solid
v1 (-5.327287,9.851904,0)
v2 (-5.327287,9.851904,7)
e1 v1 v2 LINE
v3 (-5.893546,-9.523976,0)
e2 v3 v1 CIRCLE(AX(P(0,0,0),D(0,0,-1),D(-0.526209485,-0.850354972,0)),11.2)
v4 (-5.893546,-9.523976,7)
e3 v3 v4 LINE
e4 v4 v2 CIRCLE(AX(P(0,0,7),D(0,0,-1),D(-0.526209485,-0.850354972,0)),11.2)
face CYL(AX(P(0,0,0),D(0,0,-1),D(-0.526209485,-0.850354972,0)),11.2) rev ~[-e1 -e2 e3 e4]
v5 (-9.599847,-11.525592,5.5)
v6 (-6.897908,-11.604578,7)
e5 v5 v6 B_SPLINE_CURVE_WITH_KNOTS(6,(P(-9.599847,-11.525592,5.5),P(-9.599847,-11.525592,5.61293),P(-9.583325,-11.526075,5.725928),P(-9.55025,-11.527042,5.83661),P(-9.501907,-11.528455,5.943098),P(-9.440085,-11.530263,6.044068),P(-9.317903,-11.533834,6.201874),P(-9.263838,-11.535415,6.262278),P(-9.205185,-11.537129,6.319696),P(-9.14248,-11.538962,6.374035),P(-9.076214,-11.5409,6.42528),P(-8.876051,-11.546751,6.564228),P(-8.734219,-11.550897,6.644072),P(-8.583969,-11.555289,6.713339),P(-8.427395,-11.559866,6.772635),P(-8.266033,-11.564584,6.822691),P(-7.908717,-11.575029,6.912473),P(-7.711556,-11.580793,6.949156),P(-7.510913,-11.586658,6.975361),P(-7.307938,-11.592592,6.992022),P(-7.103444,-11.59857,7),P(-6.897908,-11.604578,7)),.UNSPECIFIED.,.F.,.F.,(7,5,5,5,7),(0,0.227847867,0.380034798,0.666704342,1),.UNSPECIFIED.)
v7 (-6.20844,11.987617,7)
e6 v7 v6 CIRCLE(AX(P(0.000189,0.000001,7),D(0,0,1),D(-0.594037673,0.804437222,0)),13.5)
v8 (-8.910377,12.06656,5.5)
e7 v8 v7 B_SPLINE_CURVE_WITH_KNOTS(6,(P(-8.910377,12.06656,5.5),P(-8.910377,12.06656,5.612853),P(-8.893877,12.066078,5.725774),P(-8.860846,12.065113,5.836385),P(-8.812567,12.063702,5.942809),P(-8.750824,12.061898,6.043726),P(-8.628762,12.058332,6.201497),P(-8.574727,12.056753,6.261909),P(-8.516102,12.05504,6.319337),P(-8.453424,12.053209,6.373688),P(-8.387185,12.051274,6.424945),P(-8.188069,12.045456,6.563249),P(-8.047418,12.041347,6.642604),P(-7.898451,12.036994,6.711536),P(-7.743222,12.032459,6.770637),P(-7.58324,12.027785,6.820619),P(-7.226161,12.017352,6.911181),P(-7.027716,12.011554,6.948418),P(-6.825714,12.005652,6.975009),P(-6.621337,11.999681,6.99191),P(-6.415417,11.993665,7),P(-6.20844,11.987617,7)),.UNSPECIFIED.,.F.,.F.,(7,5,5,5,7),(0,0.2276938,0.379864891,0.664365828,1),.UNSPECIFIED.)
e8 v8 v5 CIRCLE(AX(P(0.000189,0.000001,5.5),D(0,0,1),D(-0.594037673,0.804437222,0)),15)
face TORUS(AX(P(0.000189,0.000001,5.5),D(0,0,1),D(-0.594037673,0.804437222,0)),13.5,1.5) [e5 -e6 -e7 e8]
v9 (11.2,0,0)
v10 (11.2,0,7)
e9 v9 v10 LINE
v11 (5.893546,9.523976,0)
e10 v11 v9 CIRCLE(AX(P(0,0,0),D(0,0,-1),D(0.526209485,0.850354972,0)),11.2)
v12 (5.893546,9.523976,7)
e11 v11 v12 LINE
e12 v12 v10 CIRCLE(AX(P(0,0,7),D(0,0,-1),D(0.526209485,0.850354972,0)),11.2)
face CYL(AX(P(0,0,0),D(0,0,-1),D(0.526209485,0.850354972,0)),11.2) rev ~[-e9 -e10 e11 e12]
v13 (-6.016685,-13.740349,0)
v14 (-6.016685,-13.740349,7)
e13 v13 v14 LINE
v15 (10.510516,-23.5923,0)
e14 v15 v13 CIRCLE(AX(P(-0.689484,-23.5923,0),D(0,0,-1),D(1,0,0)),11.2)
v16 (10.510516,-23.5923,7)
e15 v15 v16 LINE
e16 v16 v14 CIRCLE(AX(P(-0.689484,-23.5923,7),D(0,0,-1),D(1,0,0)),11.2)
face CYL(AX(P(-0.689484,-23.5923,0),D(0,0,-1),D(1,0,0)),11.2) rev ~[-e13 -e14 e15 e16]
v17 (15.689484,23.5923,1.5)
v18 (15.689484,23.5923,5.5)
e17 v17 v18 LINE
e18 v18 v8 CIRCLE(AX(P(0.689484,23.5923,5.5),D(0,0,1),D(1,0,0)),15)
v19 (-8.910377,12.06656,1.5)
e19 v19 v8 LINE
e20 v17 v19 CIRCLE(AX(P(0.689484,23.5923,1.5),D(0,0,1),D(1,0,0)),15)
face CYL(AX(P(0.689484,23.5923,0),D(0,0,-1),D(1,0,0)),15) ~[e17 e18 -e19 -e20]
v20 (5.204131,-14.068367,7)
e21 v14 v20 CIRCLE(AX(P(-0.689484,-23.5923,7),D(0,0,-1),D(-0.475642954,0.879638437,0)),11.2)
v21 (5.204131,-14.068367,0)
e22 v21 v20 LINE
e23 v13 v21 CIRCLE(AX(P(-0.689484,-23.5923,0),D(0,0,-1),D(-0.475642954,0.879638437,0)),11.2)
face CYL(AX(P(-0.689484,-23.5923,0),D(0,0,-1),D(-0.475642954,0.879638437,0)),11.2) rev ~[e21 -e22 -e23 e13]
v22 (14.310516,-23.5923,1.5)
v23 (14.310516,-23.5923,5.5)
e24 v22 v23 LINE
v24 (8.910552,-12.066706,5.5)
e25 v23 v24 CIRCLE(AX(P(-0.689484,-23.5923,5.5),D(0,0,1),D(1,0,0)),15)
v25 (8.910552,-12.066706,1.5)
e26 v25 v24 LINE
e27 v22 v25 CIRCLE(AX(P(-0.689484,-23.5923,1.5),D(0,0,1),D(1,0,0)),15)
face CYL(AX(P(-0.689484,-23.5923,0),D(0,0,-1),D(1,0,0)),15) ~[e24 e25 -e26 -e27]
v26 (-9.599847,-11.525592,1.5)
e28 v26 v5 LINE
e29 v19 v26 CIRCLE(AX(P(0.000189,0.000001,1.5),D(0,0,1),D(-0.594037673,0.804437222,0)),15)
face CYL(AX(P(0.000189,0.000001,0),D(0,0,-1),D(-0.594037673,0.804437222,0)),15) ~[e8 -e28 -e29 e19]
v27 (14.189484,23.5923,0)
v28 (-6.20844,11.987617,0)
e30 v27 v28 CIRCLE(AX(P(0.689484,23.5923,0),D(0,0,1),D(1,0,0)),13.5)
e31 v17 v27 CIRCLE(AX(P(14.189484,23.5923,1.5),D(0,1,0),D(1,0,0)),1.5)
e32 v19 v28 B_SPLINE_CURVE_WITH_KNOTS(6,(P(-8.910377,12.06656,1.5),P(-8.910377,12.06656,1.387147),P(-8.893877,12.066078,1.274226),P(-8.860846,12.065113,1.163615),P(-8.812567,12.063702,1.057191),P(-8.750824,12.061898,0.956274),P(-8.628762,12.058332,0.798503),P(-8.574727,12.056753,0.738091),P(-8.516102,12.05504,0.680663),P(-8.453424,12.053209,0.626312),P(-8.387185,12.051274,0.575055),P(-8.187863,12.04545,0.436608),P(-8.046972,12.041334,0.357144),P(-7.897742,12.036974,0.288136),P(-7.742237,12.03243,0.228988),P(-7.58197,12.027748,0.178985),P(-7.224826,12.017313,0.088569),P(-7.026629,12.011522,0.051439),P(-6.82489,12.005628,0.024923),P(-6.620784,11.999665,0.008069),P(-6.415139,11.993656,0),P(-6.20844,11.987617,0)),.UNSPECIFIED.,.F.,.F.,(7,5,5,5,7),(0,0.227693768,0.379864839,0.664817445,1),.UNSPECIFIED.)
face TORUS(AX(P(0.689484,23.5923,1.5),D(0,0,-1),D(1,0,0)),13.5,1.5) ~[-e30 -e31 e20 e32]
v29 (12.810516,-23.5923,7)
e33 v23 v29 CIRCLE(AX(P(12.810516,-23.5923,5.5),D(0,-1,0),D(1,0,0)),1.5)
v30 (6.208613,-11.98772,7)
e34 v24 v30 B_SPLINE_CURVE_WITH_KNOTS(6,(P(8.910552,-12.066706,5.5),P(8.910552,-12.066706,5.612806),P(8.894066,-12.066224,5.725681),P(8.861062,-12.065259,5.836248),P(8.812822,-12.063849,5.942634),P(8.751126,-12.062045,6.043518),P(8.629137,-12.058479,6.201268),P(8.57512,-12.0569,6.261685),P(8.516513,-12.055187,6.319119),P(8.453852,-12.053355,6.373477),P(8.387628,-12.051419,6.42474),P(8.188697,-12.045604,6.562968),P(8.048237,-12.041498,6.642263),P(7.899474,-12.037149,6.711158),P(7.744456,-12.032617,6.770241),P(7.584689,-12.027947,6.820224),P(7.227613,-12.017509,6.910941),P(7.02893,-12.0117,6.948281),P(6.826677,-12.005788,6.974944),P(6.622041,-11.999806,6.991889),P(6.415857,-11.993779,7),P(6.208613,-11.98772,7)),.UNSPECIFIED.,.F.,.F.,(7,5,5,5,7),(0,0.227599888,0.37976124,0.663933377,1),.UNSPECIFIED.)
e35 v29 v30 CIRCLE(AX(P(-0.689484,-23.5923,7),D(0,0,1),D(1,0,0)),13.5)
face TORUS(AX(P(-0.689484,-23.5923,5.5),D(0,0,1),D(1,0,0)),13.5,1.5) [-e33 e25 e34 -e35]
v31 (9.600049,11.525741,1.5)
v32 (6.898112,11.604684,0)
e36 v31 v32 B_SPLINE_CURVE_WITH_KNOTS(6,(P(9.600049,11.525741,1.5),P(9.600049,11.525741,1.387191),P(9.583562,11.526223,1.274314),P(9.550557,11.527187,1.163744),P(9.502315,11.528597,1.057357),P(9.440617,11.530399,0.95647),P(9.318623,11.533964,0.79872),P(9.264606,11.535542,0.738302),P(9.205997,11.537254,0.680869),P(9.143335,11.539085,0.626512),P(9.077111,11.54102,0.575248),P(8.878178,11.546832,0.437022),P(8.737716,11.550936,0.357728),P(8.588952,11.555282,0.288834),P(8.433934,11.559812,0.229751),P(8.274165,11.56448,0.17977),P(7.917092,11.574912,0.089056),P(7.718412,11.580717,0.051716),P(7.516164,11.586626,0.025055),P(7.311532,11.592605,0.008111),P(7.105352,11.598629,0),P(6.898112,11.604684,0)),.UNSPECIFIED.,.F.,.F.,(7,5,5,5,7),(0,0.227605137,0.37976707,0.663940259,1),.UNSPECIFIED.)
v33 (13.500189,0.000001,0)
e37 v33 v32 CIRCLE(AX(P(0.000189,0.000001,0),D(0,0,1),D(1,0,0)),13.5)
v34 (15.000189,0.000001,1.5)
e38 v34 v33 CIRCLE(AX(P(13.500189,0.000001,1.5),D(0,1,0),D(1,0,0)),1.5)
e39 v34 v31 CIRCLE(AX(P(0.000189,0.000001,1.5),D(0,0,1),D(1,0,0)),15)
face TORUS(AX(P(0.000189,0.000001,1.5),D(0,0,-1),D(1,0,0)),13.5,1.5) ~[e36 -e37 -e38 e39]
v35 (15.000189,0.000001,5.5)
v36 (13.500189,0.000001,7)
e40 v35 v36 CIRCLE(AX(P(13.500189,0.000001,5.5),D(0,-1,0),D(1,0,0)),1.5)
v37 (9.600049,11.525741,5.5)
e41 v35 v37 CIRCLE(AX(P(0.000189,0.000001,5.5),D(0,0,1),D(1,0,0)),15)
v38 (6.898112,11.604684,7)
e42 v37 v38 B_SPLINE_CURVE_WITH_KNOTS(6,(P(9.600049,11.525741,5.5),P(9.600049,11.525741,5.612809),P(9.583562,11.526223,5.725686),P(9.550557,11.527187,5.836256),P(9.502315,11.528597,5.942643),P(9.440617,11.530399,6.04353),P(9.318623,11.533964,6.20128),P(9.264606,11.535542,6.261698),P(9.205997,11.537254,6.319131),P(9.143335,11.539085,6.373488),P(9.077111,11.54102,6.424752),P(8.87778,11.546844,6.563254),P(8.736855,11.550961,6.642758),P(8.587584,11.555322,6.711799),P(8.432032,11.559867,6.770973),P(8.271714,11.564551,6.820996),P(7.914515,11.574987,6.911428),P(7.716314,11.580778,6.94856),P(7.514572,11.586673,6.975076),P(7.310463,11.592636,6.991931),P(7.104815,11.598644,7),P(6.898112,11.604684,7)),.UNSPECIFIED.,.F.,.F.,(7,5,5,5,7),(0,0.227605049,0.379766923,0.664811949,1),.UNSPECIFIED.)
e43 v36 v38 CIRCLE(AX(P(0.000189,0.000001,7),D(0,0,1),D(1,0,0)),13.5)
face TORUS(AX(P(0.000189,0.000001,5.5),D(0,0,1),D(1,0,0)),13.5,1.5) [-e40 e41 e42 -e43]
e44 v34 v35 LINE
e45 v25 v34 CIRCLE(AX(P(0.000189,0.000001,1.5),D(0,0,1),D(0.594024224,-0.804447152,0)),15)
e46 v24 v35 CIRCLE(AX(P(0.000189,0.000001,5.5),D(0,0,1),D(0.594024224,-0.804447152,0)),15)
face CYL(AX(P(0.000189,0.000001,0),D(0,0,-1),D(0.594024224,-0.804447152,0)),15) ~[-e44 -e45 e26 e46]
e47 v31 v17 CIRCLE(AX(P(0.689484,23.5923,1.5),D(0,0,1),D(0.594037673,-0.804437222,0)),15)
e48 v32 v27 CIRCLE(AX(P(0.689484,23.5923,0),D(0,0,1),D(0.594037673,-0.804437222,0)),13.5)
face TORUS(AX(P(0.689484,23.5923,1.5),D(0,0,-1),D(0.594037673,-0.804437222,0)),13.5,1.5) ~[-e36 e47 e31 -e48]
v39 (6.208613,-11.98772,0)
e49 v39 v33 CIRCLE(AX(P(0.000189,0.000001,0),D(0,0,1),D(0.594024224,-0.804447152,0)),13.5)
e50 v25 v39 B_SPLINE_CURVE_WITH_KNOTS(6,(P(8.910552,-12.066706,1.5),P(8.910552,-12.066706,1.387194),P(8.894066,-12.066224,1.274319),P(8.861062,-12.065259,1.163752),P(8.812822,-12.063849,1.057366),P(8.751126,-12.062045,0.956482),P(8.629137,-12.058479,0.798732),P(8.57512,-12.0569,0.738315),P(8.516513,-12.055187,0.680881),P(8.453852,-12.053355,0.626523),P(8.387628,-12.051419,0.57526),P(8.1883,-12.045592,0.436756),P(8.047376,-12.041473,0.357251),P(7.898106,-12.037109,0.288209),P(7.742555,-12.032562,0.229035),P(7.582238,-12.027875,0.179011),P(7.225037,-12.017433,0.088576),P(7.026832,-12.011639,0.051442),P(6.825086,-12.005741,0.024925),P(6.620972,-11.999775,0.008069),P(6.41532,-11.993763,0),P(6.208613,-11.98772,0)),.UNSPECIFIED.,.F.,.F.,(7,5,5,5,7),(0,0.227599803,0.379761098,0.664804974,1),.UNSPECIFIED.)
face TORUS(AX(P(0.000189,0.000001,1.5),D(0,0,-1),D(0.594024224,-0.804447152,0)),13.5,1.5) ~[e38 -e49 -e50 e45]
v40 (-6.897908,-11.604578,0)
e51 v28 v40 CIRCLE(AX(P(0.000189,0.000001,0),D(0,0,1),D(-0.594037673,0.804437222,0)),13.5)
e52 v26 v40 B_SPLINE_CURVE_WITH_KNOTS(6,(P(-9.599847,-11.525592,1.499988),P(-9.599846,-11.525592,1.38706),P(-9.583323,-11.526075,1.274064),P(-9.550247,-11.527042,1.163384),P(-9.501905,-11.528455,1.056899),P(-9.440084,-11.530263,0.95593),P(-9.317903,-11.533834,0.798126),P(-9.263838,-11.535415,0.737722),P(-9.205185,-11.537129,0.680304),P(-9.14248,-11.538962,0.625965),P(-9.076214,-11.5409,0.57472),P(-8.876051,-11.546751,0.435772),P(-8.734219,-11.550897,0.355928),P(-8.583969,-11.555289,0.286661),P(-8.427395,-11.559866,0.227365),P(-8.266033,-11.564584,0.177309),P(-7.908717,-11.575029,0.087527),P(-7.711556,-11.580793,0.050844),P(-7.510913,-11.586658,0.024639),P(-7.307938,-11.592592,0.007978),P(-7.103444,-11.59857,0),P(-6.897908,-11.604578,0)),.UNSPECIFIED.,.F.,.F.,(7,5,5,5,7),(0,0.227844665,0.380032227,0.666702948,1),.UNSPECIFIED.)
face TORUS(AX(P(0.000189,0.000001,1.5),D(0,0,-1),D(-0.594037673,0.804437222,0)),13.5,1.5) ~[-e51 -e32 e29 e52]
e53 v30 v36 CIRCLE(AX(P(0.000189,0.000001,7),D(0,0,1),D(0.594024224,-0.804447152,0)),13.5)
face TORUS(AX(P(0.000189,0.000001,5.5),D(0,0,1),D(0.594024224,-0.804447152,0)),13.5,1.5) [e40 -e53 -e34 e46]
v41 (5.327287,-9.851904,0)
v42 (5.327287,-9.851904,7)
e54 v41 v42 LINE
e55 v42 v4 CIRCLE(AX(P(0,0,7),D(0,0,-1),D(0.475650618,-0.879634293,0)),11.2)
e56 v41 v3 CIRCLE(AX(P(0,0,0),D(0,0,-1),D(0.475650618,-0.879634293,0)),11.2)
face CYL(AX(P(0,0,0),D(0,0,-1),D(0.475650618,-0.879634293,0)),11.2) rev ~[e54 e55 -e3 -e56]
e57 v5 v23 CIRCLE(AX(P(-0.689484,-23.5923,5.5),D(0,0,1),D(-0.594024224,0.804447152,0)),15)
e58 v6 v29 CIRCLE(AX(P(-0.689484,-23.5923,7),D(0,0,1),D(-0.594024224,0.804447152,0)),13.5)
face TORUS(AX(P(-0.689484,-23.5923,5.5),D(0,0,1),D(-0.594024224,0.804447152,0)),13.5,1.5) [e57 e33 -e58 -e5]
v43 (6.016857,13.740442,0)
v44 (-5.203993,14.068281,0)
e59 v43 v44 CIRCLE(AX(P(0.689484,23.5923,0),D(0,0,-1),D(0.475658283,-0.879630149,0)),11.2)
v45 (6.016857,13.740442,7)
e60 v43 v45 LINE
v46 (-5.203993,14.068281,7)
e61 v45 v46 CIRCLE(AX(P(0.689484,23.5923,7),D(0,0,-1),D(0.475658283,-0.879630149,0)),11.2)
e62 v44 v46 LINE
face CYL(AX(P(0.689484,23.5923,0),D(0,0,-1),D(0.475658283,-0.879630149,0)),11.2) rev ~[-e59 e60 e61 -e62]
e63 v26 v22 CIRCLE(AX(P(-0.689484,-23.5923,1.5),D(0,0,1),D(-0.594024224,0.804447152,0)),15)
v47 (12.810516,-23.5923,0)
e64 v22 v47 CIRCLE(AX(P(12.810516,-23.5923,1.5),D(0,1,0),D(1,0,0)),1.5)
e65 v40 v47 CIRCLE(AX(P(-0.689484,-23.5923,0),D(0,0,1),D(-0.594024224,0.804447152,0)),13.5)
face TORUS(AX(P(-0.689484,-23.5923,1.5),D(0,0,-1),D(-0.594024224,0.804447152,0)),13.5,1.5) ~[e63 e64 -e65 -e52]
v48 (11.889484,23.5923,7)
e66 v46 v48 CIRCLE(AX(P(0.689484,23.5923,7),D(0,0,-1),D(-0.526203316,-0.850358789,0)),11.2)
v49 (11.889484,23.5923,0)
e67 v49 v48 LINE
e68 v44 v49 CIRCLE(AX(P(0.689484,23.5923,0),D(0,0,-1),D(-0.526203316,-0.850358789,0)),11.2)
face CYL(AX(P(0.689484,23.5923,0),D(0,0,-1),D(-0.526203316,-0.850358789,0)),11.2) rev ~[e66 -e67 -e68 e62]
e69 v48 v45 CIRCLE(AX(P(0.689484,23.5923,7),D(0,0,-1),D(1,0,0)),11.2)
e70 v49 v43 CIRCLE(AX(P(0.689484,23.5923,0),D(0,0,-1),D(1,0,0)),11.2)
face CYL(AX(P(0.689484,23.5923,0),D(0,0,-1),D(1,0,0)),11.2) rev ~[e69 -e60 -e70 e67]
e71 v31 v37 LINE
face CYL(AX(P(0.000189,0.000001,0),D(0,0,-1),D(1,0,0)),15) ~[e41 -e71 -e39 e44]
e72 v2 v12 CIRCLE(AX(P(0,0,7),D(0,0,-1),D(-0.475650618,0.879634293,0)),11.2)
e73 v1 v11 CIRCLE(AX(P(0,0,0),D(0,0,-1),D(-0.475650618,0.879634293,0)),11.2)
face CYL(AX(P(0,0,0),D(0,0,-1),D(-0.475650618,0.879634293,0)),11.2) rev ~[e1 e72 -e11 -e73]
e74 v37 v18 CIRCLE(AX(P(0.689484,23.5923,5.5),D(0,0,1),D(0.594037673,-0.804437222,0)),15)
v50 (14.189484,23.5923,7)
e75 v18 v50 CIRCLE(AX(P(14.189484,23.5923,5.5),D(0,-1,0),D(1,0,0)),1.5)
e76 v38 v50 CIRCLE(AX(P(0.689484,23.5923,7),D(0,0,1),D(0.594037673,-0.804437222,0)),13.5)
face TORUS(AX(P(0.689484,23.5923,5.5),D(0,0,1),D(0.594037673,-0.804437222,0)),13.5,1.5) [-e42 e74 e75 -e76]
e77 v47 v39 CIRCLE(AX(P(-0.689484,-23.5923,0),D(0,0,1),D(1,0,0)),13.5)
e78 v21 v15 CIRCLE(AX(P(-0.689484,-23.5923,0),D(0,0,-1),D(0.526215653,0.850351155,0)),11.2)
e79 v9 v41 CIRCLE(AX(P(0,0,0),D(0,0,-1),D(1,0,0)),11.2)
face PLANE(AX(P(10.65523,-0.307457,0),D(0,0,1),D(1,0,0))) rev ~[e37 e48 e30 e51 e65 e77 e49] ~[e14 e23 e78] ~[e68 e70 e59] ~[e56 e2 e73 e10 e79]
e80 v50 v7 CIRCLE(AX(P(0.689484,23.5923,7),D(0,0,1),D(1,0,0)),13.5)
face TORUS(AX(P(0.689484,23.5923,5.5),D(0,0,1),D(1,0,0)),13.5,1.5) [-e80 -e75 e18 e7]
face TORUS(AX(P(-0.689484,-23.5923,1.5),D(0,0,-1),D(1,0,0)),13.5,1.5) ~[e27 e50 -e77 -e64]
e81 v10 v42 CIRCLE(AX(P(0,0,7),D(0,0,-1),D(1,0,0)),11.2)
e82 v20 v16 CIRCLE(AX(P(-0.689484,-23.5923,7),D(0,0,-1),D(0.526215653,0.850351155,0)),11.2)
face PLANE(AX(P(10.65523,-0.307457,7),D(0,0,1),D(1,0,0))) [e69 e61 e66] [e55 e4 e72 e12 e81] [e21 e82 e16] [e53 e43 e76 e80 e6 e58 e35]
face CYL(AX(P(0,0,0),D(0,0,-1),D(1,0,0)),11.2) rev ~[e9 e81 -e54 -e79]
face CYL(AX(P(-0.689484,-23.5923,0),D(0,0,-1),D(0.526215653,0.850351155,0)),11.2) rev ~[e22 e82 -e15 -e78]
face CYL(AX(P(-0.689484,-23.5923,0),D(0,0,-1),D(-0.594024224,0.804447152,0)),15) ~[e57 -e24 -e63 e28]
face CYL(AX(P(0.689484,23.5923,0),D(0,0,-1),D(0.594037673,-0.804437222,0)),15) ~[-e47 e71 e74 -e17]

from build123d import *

# Parameters (mm, degrees)
F1_DEPTH = 7
F2_R     = 1.5


# Not quite as in the source:
# - a feature names something its author has since deleted; it is built from what else it names


with BuildPart() as f1:
    # F0 (on Top) → F1 (new body)
    with BuildSketch(Plane.XY):
        with BuildLine():
            ThreePointArc((5.8935462297, 9.5239756845), (9.7838570557, 5.4512513347), (11.2, 0))
            ThreePointArc((11.2, 0), (9.6204369325, -5.734735672), (5.3272869237, -9.8519040816))
            ThreePointArc((5.3272869237, -9.8519040816), (7.197055209, -10.8328912854), (8.9105519184, -12.0667058427))
            ThreePointArc((8.9105519184, -12.0667058427), (13.39151878, -6.7581251296), (15.0001885534, 1.4424e-06))
            ThreePointArc((15.0001885534, 1.4424e-06), (13.5832277592, 6.3640446487), (9.6000490957, 11.5257412263))
            ThreePointArc((9.6000490957, 11.5257412263), (7.8174179542, 10.3940967316), (5.8935462297, 9.5239756845))
        make_face()
        with BuildLine():
            ThreePointArc((-5.3272869237, 9.8519040816), (0.327179857, 11.1952201113), (5.8935462297, 9.5239756845))
            ThreePointArc((5.8935462297, 9.5239756845), (7.8174179542, 10.3940967316), (9.6000490957, 11.5257412263))
            ThreePointArc((9.6000490957, 11.5257412263), (7.8865830002, 12.7594991844), (6.0168567698, 13.7404418856))
            ThreePointArc((6.0168567698, 13.7404418856), (0.3623935251, 12.3970768259), (-5.2039931394, 14.0682811136))
            ThreePointArc((-5.2039931394, 14.0682811136), (-7.1278014357, 13.1981739945), (-8.910376538, 12.066559765))
            ThreePointArc((-8.910376538, 12.066559765), (-7.196958132, 10.832831283), (-5.3272869237, 9.8519040816))
        make_face()
        with BuildLine():
            ThreePointArc((8.9105519184, -12.0667058427), (7.197055209, -10.8328912854), (5.3272869237, -9.8519040816))
            ThreePointArc((5.3272869237, -9.8519040816), (-0.327179857, -11.1952201113), (-5.8935462297, -9.5239756845))
            ThreePointArc((-5.8935462297, -9.5239756845), (-7.8173076322, -10.3940371507), (-9.5998473694, -11.5255922639))
            ThreePointArc((-9.5998473694, -11.5255922639), (-7.8863983485, -12.759377345), (-6.0166850845, -13.740349049))
            ThreePointArc((-6.0166850845, -13.740349049), (-0.3622147698, -12.39708205), (5.2041313094, -14.0683666148))
            ThreePointArc((5.2041313094, -14.0683666148), (7.1279561409, -13.1982912207), (8.9105519184, -12.0667058427))
        make_face()
        with BuildLine():
            ThreePointArc((-5.8935462297, -9.5239756845), (-11.1952201113, 0.327179857), (-5.3272869237, 9.8519040816))
            ThreePointArc((-5.3272869237, 9.8519040816), (-7.196958132, 10.832831283), (-8.910376538, 12.066559765))
            ThreePointArc((-8.910376538, 12.066559765), (-14.9934099745, 0.4381831238), (-9.5998473694, -11.5255922639))
            ThreePointArc((-9.5998473694, -11.5255922639), (-7.8173076322, -10.3940371507), (-5.8935462297, -9.5239756845))
        make_face()
        with BuildLine():
            ThreePointArc((6.0168567698, 13.7404418856), (7.8865830002, 12.7594991844), (9.6000490957, 11.5257412263))
            ThreePointArc((9.6000490957, 11.5257412263), (14.0808707207, 16.8342849133), (15.6894840044, 23.5922995489))
            ThreePointArc((15.6894840044, 23.5922995489), (-5.6745592019, 37.1753387548), (-8.910376538, 12.066559765))
            ThreePointArc((-8.910376538, 12.066559765), (-7.1278014357, 13.1981739945), (-5.2039931394, 14.0682811136))
            ThreePointArc((-5.2039931394, 14.0682811136), (-4.7618028157, 33.3761368332), (11.8894840044, 23.5922995489))
            ThreePointArc((11.8894840044, 23.5922995489), (10.3099459209, 17.8576057895), (6.0168567698, 13.7404418856))
        make_face()
        with BuildLine():
            ThreePointArc((14.3105159956, -23.5922995489), (12.8936036203, -17.228359686), (8.9105519184, -12.0667058427))
            ThreePointArc((8.9105519184, -12.0667058427), (7.1279561409, -13.1982912207), (5.2041313094, -14.0683666148))
            ThreePointArc((5.2041313094, -14.0683666148), (9.0943928222, -18.1410836989), (10.5105159956, -23.5922995489))
            ThreePointArc((10.5105159956, -23.5922995489), (-6.4242615896, -33.2127114969), (-6.0166850845, -13.740349049))
            ThreePointArc((-6.0166850845, -13.740349049), (-7.8863983485, -12.759377345), (-9.5998473694, -11.5255922639))
            ThreePointArc((-9.5998473694, -11.5255922639), (-7.4476105763, -36.9836297755), (14.3105159956, -23.5922995489))
        make_face()
    extrude(amount=F1_DEPTH)

    # F2
    f2_edges = [f1.edges().sort_by_distance(p)[0] for p in [
        (-1.127791, -38.585894, 0),
        (-14.99341, 0.438183, 0),
        (-1.127791, -38.585894, 7),
        (-14.99341, 0.438183, 7),
        (1.127552, 38.585901, 0),
        (1.127552, 38.585901, 7),
        (14.993787, -0.438191, 0),
        (14.993787, -0.438191, 7),
    ]]
    fillet(f2_edges, radius=F2_R)


solid = f1.part
